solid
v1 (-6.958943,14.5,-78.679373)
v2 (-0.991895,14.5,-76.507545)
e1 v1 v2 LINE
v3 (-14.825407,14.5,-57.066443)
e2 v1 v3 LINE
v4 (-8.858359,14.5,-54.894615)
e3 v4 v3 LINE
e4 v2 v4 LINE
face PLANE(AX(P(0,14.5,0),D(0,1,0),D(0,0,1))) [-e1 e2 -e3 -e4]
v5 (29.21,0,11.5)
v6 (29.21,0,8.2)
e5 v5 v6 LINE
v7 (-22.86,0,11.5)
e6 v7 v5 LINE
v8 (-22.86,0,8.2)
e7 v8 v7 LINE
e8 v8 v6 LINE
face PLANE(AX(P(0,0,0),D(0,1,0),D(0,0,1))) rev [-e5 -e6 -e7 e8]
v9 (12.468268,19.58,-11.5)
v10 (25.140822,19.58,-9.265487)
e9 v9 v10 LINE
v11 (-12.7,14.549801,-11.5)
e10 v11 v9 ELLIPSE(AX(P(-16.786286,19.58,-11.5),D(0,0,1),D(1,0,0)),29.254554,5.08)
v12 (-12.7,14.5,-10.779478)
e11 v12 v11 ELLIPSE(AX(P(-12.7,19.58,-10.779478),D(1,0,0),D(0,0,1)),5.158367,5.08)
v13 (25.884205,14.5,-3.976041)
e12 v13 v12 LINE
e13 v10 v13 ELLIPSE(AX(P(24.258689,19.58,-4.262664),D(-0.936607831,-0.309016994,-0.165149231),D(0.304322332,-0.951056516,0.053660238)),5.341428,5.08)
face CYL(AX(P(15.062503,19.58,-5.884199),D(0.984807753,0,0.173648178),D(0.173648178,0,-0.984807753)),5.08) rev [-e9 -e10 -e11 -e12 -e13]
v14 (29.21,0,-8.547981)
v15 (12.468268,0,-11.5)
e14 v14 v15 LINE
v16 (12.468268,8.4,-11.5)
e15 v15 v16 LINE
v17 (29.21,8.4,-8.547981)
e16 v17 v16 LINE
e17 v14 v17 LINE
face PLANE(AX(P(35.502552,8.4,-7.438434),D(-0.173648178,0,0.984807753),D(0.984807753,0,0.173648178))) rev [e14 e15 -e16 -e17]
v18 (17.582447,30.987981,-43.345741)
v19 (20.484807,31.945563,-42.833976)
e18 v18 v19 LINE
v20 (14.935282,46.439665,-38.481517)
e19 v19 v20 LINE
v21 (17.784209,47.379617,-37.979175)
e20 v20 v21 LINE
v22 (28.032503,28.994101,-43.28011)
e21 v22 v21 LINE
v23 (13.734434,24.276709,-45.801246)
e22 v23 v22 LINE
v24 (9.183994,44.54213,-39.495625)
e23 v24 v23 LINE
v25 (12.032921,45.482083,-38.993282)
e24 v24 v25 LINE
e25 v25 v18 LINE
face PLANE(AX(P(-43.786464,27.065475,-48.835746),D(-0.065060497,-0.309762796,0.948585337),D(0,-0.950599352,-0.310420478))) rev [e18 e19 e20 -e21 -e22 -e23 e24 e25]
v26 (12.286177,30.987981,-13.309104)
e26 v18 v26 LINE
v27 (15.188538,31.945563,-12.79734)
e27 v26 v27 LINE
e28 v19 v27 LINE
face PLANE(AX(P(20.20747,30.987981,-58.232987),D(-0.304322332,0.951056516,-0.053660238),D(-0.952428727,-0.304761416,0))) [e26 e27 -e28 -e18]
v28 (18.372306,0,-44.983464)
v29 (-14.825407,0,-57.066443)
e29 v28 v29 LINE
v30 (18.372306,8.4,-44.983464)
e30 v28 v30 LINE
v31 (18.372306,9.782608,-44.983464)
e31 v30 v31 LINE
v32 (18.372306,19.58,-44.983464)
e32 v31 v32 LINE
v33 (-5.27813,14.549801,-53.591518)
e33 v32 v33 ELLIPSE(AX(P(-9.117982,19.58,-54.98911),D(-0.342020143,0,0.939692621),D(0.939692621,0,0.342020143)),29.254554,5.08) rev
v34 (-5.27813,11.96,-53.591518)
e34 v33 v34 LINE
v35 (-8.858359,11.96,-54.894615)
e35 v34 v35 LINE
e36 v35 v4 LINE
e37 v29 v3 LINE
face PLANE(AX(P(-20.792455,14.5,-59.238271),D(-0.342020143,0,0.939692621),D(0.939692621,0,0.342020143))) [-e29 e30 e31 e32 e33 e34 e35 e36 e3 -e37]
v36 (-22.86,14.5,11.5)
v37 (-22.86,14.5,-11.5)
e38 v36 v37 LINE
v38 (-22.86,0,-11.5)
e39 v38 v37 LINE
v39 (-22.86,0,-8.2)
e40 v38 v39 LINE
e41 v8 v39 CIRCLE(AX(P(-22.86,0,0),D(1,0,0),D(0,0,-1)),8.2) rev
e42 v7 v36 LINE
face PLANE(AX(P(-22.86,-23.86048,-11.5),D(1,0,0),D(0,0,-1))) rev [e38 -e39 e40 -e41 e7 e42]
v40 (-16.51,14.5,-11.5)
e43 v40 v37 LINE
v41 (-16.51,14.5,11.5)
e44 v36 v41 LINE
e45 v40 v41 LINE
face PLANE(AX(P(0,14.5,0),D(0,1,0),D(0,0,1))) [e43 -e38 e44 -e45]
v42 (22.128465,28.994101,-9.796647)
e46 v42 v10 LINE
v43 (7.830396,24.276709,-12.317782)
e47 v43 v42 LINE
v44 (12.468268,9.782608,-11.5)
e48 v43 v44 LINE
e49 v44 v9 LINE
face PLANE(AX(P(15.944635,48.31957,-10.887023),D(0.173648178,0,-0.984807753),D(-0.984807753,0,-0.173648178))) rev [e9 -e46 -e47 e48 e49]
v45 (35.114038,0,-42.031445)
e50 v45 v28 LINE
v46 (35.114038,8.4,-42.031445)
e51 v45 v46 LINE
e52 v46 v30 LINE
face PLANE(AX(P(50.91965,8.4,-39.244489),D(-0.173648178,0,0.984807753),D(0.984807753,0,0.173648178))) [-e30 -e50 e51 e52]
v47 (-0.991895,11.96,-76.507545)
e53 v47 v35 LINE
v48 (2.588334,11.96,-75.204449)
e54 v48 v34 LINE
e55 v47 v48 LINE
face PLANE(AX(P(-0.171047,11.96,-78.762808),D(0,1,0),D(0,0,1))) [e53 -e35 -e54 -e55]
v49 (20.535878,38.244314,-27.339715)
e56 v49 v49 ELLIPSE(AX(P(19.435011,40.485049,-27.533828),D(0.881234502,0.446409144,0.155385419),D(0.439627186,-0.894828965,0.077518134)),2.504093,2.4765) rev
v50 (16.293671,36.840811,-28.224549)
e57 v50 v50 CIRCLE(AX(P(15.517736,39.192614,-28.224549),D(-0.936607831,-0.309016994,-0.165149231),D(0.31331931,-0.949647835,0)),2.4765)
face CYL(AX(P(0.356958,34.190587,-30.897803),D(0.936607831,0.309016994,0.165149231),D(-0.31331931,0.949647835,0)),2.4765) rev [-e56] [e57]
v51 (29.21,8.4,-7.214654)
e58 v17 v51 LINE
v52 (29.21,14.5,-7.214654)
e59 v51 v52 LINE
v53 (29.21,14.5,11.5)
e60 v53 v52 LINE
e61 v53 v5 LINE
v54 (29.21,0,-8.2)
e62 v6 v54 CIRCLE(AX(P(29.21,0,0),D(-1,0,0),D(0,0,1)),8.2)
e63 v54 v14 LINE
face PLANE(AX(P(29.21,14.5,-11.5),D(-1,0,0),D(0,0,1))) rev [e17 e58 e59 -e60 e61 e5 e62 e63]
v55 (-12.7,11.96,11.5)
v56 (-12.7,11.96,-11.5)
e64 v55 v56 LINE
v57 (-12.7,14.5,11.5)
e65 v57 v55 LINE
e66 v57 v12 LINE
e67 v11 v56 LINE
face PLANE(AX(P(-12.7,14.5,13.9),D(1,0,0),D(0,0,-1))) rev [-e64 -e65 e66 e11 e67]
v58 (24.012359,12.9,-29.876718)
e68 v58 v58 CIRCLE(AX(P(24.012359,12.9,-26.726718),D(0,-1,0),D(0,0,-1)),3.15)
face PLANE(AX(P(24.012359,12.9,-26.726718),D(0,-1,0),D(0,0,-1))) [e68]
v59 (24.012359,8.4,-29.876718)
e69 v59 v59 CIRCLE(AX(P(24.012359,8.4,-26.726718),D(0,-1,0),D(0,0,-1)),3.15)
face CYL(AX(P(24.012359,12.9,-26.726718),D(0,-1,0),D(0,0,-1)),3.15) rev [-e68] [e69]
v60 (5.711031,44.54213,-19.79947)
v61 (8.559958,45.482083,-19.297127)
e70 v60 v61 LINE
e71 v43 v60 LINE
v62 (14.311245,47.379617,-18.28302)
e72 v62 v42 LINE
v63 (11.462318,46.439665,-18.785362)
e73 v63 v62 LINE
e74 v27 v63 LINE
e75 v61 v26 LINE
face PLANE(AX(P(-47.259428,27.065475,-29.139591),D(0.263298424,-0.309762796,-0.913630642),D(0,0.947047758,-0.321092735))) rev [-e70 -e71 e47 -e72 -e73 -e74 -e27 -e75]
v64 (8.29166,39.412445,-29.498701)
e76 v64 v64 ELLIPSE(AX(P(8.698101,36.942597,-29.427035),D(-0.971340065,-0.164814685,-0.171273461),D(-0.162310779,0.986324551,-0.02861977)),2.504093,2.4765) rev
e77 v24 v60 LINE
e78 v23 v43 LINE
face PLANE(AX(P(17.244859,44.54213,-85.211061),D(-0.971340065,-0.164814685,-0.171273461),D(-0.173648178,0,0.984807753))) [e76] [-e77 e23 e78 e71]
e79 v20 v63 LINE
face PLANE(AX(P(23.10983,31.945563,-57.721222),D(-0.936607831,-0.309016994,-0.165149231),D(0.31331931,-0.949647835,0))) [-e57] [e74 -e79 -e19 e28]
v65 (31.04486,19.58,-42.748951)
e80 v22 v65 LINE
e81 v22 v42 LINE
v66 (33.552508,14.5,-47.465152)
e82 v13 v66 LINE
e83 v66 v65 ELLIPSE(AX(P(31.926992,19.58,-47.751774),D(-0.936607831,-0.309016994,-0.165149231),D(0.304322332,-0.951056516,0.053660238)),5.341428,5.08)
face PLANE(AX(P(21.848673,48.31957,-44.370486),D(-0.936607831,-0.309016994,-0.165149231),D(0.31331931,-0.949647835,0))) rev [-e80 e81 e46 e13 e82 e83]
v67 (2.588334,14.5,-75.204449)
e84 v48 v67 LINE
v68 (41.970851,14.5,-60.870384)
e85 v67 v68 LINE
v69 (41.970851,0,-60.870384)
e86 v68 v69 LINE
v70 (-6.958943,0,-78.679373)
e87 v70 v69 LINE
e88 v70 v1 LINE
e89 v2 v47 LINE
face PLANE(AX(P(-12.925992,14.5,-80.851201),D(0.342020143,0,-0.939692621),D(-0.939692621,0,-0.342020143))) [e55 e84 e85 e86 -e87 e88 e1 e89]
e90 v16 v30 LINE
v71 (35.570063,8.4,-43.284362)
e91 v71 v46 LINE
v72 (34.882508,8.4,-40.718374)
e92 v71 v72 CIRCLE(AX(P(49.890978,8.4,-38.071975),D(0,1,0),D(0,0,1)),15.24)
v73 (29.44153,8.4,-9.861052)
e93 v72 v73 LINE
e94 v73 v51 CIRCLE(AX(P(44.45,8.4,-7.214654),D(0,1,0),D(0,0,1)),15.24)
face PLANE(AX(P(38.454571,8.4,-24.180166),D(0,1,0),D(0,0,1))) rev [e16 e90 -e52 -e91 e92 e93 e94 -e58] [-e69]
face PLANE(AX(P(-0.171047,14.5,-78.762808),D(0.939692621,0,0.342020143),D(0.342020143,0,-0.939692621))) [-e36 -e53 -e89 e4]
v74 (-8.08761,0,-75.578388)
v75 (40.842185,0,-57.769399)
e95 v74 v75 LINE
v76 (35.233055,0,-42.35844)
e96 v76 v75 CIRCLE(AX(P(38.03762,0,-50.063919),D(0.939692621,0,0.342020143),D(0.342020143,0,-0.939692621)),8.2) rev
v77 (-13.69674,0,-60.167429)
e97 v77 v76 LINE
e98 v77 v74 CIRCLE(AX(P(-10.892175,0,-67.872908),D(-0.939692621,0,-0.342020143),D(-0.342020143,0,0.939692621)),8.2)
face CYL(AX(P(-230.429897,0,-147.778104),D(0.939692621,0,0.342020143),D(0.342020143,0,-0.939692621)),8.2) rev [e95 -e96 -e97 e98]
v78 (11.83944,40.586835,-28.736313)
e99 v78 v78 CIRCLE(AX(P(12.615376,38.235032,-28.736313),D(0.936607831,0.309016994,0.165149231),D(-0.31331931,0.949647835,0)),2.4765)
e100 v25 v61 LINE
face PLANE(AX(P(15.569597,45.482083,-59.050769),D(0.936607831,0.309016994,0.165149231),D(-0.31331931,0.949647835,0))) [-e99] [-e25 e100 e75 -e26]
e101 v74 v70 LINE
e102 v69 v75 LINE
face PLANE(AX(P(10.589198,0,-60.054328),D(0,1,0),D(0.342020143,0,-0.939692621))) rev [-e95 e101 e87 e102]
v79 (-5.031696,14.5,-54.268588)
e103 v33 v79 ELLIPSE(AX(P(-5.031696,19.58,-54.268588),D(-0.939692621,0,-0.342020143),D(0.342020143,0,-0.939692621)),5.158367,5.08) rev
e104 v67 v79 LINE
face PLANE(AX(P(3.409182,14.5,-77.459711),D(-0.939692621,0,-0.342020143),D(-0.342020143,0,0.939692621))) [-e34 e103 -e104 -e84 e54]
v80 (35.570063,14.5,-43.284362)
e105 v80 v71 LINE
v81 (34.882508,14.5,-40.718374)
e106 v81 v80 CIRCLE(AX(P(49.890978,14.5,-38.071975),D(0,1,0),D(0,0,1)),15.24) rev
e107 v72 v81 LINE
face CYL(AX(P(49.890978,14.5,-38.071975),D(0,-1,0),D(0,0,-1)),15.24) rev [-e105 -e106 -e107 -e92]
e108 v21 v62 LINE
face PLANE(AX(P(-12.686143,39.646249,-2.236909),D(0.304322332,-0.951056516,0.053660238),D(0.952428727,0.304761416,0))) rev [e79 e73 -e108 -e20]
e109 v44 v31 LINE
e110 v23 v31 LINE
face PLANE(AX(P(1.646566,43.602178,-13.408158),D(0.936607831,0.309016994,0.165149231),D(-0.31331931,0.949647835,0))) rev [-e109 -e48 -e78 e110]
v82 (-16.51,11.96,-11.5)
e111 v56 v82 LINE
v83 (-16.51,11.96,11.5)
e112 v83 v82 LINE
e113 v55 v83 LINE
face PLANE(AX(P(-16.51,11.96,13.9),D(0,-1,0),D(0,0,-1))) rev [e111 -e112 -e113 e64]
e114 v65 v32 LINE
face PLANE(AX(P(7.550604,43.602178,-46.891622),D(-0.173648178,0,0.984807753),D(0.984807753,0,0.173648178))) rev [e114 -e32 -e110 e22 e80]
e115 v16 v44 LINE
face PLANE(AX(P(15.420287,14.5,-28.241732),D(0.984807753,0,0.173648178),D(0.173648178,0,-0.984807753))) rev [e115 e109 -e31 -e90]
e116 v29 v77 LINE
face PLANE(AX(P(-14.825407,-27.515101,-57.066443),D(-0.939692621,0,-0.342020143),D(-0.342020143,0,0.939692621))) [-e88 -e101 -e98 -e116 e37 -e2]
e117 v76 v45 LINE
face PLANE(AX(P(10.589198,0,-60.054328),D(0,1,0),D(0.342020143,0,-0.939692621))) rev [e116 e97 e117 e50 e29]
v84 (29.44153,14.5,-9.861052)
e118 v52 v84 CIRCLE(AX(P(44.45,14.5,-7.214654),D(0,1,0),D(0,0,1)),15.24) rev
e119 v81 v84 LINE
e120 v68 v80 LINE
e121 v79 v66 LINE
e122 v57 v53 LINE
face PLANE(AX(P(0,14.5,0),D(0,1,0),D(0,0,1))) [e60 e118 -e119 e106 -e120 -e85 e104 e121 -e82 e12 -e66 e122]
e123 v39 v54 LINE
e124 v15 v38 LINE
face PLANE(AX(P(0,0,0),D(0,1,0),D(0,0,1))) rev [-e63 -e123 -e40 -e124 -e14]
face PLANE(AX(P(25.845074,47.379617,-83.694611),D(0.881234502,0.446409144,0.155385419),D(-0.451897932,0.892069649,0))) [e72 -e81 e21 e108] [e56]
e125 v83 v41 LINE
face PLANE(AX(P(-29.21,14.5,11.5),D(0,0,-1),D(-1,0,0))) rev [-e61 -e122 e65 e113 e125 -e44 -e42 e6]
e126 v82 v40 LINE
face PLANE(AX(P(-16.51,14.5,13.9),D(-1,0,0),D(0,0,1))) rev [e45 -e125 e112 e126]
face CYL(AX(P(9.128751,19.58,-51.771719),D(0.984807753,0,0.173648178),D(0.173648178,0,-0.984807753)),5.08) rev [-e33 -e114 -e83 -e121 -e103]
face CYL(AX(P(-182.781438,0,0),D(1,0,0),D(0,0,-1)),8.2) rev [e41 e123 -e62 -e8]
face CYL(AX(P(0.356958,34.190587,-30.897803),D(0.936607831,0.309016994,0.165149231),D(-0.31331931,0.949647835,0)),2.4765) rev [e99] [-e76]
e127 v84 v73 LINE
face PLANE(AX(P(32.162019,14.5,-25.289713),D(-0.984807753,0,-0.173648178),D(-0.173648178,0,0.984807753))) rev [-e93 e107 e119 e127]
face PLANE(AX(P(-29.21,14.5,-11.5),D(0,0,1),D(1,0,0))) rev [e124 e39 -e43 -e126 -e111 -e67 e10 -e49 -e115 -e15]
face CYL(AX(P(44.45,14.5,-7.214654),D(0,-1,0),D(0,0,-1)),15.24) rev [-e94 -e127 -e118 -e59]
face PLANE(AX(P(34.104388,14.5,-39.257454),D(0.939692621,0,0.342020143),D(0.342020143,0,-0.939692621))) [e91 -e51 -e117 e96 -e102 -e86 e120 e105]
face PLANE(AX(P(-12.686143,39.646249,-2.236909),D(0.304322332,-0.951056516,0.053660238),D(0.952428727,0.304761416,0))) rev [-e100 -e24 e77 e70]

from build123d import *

# Parameters (mm, degrees)
SKETCH2_W                  = 58.42
SKETCH2_H                  = 23
TWOLEGS_DEPTH              = 14.5
LEGSLOTS_DEPTH             = 62.281289151
SKETCH6_W                  = 3.81
SKETCH6_H                  = 2.54
GROOVE_DEPTH               = 25.4
MIDDLEBRIDGECUT_DEPTH      = 25.4
SKETCH8_W                  = 17
SKETCH8_H                  = 14.5
BRIDGE_DEPTH               = 17
BRIDGEUNDERCUT_REACH       = 53.567
SKETCH15_W                 = 17
SKETCH15_H                 = 8.4
MIRROR14_START             = 10.281893146
MIRROR14_OUTLINE_W         = 6.1
MIRROR14_OUTLINE_H         = 17
MIRROR14_DEPTH             = 17
CLAMPINCLINE_DEPTH         = 17
EXTRUDECONNECTOR_DEPTH     = 35.56
CONNECTORDRAFT_REACH       = 111.361
CONNECTORGROOVE_REACH      = 94.034
CONNECTORHOLE_REACH        = 111.361
SKETCH25_R                 = 2.4765
SKETCH26_R                 = 3.15
BRIDGEHOLE_DEPTH           = 4.5
FILLET1_R                  = 15.24
FILLET2_R                  = 5.08
CONNECTORDRAFT2_DEPTH      = 93.034308057
CONNECTORDRAFT2_DEPTH_BACK = 93.034308057
LEGSHORTEN_REACH           = 98.848
SKETCH28_W                 = 6.35
SKETCH28_H                 = 23


with BuildPart() as part:
    # Sketch2 → twolegs (new body)
    with BuildSketch(Plane(origin=(0, 0, 0), x_dir=(1, 0, 0), z_dir=(0, 1, 0))):
        Rectangle(SKETCH2_W, SKETCH2_H)
    twolegs = extrude(amount=TWOLEGS_DEPTH)

    # Sketch4 → legslots (cut, symmetric)
    with BuildSketch(Plane.ZY.offset(29.21)):
        with BuildLine():
            Line((-8.2, -58.921978701), (-8.2, 0))
            ThreePointArc((-8.2, 0), (0, 8.2), (8.2, 0))
            Line((8.2, 0), (8.2, -58.921978701))
            Line((8.2, -58.921978701), (8.2, -176.765936102))
            Line((8.2, -176.765936102), (-8.2, -176.765936102))
            Line((-8.2, -176.765936102), (-8.2, -58.921978701))
        make_face()
    legslots = extrude(amount=LEGSLOTS_DEPTH, both=True, mode=Mode.SUBTRACT)

    # Sketch6 → groove (cut)
    with BuildSketch(Plane(origin=(0, 0, -11.5), x_dir=(-1, 0, 0), z_dir=(0, 0, -1))):
        with Locations((14.605, 13.23)):
            Rectangle(SKETCH6_W, SKETCH6_H)
    groove = extrude(amount=-GROOVE_DEPTH, mode=Mode.SUBTRACT)

    # Sketch7 → middlebridgecut (cut)
    with BuildSketch(Plane(origin=(0, 14.5, 0), x_dir=(1, 0, 0), z_dir=(0, 1, 0))):
        Polygon((12.468268199, 11.5), (29.21, 8.54798098), (29.21, 11.5), align=None)
    extrude(amount=-MIDDLEBRIDGECUT_DEPTH, mode=Mode.SUBTRACT)

    # Sketch8 → bridge (add)
    with BuildSketch(Plane(origin=(2.342580113, 0, -13.285432008), x_dir=(-0.9848077530122094, 0, -0.17364817766692317), z_dir=(0.17364817766692317, 0, -0.9848077530122094))):
        with Locations((-18.781893146, 7.25)):
            Rectangle(SKETCH8_W, SKETCH8_H)
    extrude(amount=BRIDGE_DEPTH)

    # Sketch15 → bridgeundercut (cut, up to next)
    with BuildSketch(Plane(origin=(10.125688085, 0, 1.785432008), x_dir=(-0.17364817766692317, 0, 0.9848077530122095), z_dir=(-0.9848077530122095, 0, -0.17364817766692317)), mode=Mode.PRIVATE) as bridgeundercut_sk1:
        with Locations((-21.990381211, 4.2)):
            Rectangle(SKETCH15_W, SKETCH15_H)
    bridgeundercut_tool1 = extrude(bridgeundercut_sk1.sketch, amount=-BRIDGEUNDERCUT_REACH, mode=Mode.PRIVATE) & part.part
    bridgeundercut = bridgeundercut_tool1.solids().sort_by_distance((13.944278, 4.2, -19.870866))[0]
    add(bridgeundercut, mode=Mode.SUBTRACT)

    # Mirror14: read off the stored shape, not the designer's step
    # Mirror14 outline → Mirror14 (add)
    with BuildSketch(Plane(origin=(0, 0, 0), x_dir=(0, 1, 0), z_dir=(0.9848077530122094, 0, 0.17364817766692306)).offset(MIRROR14_START)):
        with Locations((11.45, -38.990381211)):
            Rectangle(MIRROR14_OUTLINE_W, MIRROR14_OUTLINE_H)
    extrude(amount=MIRROR14_DEPTH)

    # Mirror15: twolegs across plane
    add(twolegs.mirror(Plane(origin=(5.294599134, 0, -30.027163809), x_dir=(0.9848077530122092, 0, 0.17364817766692314), z_dir=(0.17364817766692314, 0, -0.9848077530122094))))

    # Mirror16: legslots, groove, bridgeundercut across plane
    add(legslots.mirror(Plane(origin=(5.294599134, 0, -30.027163809), x_dir=(0.9848077530122092, 0, 0.17364817766692314), z_dir=(0.17364817766692314, 0, -0.9848077530122094))), mode=Mode.SUBTRACT)
    add(groove.mirror(Plane(origin=(5.294599134, 0, -30.027163809), x_dir=(0.9848077530122092, 0, 0.17364817766692314), z_dir=(0.17364817766692314, 0, -0.9848077530122094))), mode=Mode.SUBTRACT)
    add(bridgeundercut.mirror(Plane(origin=(5.294599134, 0, -30.027163809), x_dir=(0.9848077530122092, 0, 0.17364817766692314), z_dir=(0.17364817766692314, 0, -0.9848077530122094))), mode=Mode.SUBTRACT)

    # Sketch21 → clampincline (cut, symmetric)
    with BuildSketch(Plane(origin=(5.294599134, 0, -30.027163809), x_dir=(-0.9848077530122094, 0, -0.17364817766692314), z_dir=(0.17364817766692314, 0, -0.9848077530122094))):
        Polygon((-24.800533146, 14.5), (-10.281893146, 9.782607901), (-10.281893146, 14.5), align=None)
    extrude(amount=CLAMPINCLINE_DEPTH, both=True, mode=Mode.SUBTRACT)

    # Sketch22 → extrudeconnector (add)
    with BuildSketch(Plane(origin=(-1.864440892, 5.826679393, -0.328751233), x_dir=(-0.19370062592752282, -0.006629130978421877, 0.98103828780418), z_dir=(-0.30432233187297286, 0.9510565162951554, -0.05366023794131847))):
        Polygon((-48.081564355, 27.0422172), (-14.089388689, 27.771596028), (-13.761901853, 12.509307601), (-47.754077519, 11.779928772), align=None)
    extrude(amount=EXTRUDECONNECTOR_DEPTH)

    # Sketch23 → connectordraft (cut, up to next)
    with BuildSketch(Plane(origin=(26.288198213, 8.673320607, 4.635318619), x_dir=(0.3484357800023436, -0.8710369750422688, -0.34624715930007605), z_dir=(0.9366078308002519, 0.30901699437494146, 0.16514923091290587)), mode=Mode.PRIVATE) as connectordraft_sk1:
        Polygon((-21.922562345, 53.820435592), (-0.501791973, 52.073152935), (-19.112117469, 60.231472918), align=None)
    connectordraft_tool1 = extrude(connectordraft_sk1.sketch, amount=-CONNECTORDRAFT_REACH, mode=Mode.PRIVATE) & part.part
    # Sketch23 → connectordraft (cut, up to next)
    with BuildSketch(Plane(origin=(26.288198213, 8.673320607, 4.635318619), x_dir=(0.3484357800023436, -0.8710369750422688, -0.34624715930007605), z_dir=(0.9366078308002519, 0.30901699437494146, 0.16514923091290587)), mode=Mode.PRIVATE) as connectordraft_sk2:
        Polygon((-14.152524229, 20.933828779), (-32.762849725, 29.092148762), (-29.952404848, 35.503186089), align=None)
    connectordraft_tool2 = extrude(connectordraft_sk2.sketch, amount=-CONNECTORDRAFT_REACH, mode=Mode.PRIVATE) & part.part
    add(connectordraft_tool1.solids().sort_by_distance((23.504771, 41.877747, -41.709143))[0], mode=Mode.SUBTRACT)
    add(connectordraft_tool2.solids().sort_by_distance((18.411091, 41.877747, -12.821449))[0], mode=Mode.SUBTRACT)

    # connectorgroove: up to this plane
    connectorgroove_end = Plane(origin=(-43.786464147, 27.065475321, -48.835745626), z_dir=(-0.06506049659943954, -0.3097627963249175, 0.9485853371179643))
    # Sketch24 → connectorgroove (cut, up to the surface)
    with BuildSketch(Plane(origin=(2.342580113, 0, -13.285432008), x_dir=(-0.9848077530122095, 0, -0.1736481776669232), z_dir=(0.1736481776669232, 0, -0.9848077530122095)), mode=Mode.PRIVATE) as connectorgroove_sk1:
        Polygon((-9.788420854, 30.987981431), (-12.735554786, 31.945563293), (-8.026135792, 46.439664601), (-5.079001859, 45.482082739), align=None)
    connectorgroove_tool1 = split(extrude(connectorgroove_sk1.sketch, amount=CONNECTORGROOVE_REACH, mode=Mode.PRIVATE), bisect_by=connectorgroove_end, keep=Keep.BOTH, mode=Mode.PRIVATE)
    add(connectorgroove_tool1.solids().sort_by_distance((11.114537, 38.713823, -11.738699))[0], mode=Mode.SUBTRACT)

    # connectorhole: up to this face of the body (flat: up to its plane)
    connectorhole_end = Plane(part.part.faces().sort_by_distance((10.456046087, 25.296664487, -29.117061452))[0])
    # Sketch25 → connectorhole (cut, up to the picked face)
    with BuildSketch(Plane(origin=(26.288198213, 8.673320607, 4.635318619), x_dir=(0.3484357800023436, -0.8710369750422688, -0.34624715930007605), z_dir=(0.9366078308002519, 0.30901699437494146, 0.16514923091290587)), mode=Mode.PRIVATE) as connectorhole_sk1:
        with Locations(Location((-18.958611536, 41.602440846, 0), (0, 0, 159.447358614))):
            Circle(SKETCH25_R)
    connectorhole_tool1 = split(extrude(connectorhole_sk1.sketch, amount=-CONNECTORHOLE_REACH, mode=Mode.PRIVATE), bisect_by=connectorhole_end, keep=Keep.BOTH, mode=Mode.PRIVATE)
    add(connectorhole_tool1.solids().sort_by(Axis((21.215591, 41.072519, -27.219863), (-0.9366078308002519, -0.30901699437494146, -0.16514923091290587)))[0], mode=Mode.SUBTRACT)

    # Sketch26 → bridgehole (cut)
    with BuildSketch(Plane.XZ.offset(-8.4)):
        with Locations(Location((24.012358933, -26.726717738, 0), (0, 0, 270))):
            Circle(SKETCH26_R)
    extrude(amount=-BRIDGEHOLE_DEPTH, mode=Mode.SUBTRACT)

    # Fillet1
    fillet1_edges = [part.edges().sort_by_distance(p)[0] for p in [
        (29.21, 11.45, -8.54798098),
        (35.114038041, 11.45, -42.031444582),
    ]]
    fillet(fillet1_edges, radius=FILLET1_R)

    # Fillet2
    # the kernel refuses this fillet: 5.08 mm, written as the material it adds along each edge
    with BuildSketch(Plane(origin=(-25.052907191, 14.5, -18.115995569), x_dir=(-0.17364817766692314, 0, 0.9848077530122094), z_dir=(0.9848077530122094, 0, 0.17364817766692314))) as fillet2_piece_1_section:
        with BuildLine():
            CenterArc((FILLET2_R, -FILLET2_R), FILLET2_R, 90, 90)
            Line((0, -FILLET2_R), (0, 0))
            Line((0, 0), (FILLET2_R, 0))
        make_face()
    fillet2_piece_1 = extrude(amount=65.31864, mode=Mode.PRIVATE)
    fillet2_piece_1 = split(fillet2_piece_1, bisect_by=Plane(origin=(-12.7, 14.5, -18.115995569), z_dir=(1, 0, 0)), keep=Keep.TOP, mode=Mode.PRIVATE)
    fillet2_piece_1 = split(fillet2_piece_1, bisect_by=Plane(origin=(-25.052907191, 14.5, -11.5), z_dir=(0, 0, 1)), keep=Keep.TOP, mode=Mode.PRIVATE)
    fillet2_piece_1 = split(fillet2_piece_1, bisect_by=Plane(origin=(21.81803989, 29.964230294, -9.851382987), z_dir=(-0.9366078308002517, -0.30901699437494173, -0.16514923091290615)), keep=Keep.TOP, mode=Mode.PRIVATE)
    add(fillet2_piece_1)
    with BuildSketch(Plane(origin=(-19.14886915, 14.5, -51.599459172), x_dir=(0.17364817766692314, 0, -0.9848077530122094), z_dir=(0.9848077530122094, 0, 0.17364817766692314))) as fillet2_piece_2_section:
        with BuildLine():
            CenterArc((FILLET2_R, FILLET2_R), FILLET2_R, 180, 90)
            Line((0, FILLET2_R), (0, 0))
            Line((0, 0), (FILLET2_R, 0))
        make_face()
    fillet2_piece_2 = extrude(amount=65.31864, mode=Mode.PRIVATE)
    fillet2_piece_2 = split(fillet2_piece_2, bisect_by=Plane(origin=(27.722077931, 29.964230294, -43.33484659), z_dir=(-0.9366078308002517, -0.30901699437494173, -0.16514923091290615)), keep=Keep.TOP, mode=Mode.PRIVATE)
    fillet2_piece_2 = split(fillet2_piece_2, bisect_by=Plane(origin=(-7.540933418, 14.5, -47.374516084), z_dir=(0.9396926207859135, 0, 0.342020143325655)), keep=Keep.TOP, mode=Mode.PRIVATE)
    fillet2_piece_2 = split(fillet2_piece_2, bisect_by=Plane(origin=(-16.886065398, 14.5, -57.816461387), z_dir=(0.342020143325655, 0, -0.9396926207859134)), keep=Keep.TOP, mode=Mode.PRIVATE)
    add(fillet2_piece_2)

    # Sketch27 → connectordraft2 (cut, two sides: drawn at the far end of the back side and taken through both)
    with BuildSketch(Plane(origin=(2.342580113, 0, -13.285432008), x_dir=(-0.9848077530122095, 0, -0.1736481776669232), z_dir=(0.1736481776669232, 0, -0.9848077530122095)).offset(-CONNECTORDRAFT2_DEPTH_BACK)):
        Polygon((-10.919012309, 47.37961716), (-20.091114151, 28.994101308), (-13.811888826, 48.319569719), align=None)
        Polygon((-2.186125342, 44.54213018), (-5.572474151, 24.27670921), (0.706751174, 43.602177621), align=None)
    extrude(amount=CONNECTORDRAFT2_DEPTH + CONNECTORDRAFT2_DEPTH_BACK, mode=Mode.SUBTRACT)

    # legshorten: up to this face of the body (flat: up to its plane)
    legshorten_end = Plane(part.part.faces().sort_by_distance((-3.474076782, 0, -9.752083384))[0])
    # Sketch28 → legshorten (cut, up to the picked face)
    with BuildSketch(Plane(origin=(0, 14.5, 0), x_dir=(1, 0, 0), z_dir=(0, 1, 0)), mode=Mode.PRIVATE) as legshorten_sk1:
        with Locations((-26.035, 0)):
            Rectangle(SKETCH28_W, SKETCH28_H)
    legshorten_tool1 = split(extrude(legshorten_sk1.sketch, amount=-LEGSHORTEN_REACH, mode=Mode.PRIVATE), bisect_by=legshorten_end, keep=Keep.BOTH, mode=Mode.PRIVATE)
    legshorten = legshorten_tool1.solids().sort_by(Axis((-26.035, 14.5, 0), (0, -1, 0)))[0]
    add(legshorten, mode=Mode.SUBTRACT)

    # Mirror17: legshorten across plane
    add(legshorten.mirror(Plane(origin=(5.294599134, 0, -30.027163809), x_dir=(0.9848077530122092, 0, 0.17364817766692314), z_dir=(0.17364817766692314, 0, -0.9848077530122094))), mode=Mode.SUBTRACT)


solid = part.part
